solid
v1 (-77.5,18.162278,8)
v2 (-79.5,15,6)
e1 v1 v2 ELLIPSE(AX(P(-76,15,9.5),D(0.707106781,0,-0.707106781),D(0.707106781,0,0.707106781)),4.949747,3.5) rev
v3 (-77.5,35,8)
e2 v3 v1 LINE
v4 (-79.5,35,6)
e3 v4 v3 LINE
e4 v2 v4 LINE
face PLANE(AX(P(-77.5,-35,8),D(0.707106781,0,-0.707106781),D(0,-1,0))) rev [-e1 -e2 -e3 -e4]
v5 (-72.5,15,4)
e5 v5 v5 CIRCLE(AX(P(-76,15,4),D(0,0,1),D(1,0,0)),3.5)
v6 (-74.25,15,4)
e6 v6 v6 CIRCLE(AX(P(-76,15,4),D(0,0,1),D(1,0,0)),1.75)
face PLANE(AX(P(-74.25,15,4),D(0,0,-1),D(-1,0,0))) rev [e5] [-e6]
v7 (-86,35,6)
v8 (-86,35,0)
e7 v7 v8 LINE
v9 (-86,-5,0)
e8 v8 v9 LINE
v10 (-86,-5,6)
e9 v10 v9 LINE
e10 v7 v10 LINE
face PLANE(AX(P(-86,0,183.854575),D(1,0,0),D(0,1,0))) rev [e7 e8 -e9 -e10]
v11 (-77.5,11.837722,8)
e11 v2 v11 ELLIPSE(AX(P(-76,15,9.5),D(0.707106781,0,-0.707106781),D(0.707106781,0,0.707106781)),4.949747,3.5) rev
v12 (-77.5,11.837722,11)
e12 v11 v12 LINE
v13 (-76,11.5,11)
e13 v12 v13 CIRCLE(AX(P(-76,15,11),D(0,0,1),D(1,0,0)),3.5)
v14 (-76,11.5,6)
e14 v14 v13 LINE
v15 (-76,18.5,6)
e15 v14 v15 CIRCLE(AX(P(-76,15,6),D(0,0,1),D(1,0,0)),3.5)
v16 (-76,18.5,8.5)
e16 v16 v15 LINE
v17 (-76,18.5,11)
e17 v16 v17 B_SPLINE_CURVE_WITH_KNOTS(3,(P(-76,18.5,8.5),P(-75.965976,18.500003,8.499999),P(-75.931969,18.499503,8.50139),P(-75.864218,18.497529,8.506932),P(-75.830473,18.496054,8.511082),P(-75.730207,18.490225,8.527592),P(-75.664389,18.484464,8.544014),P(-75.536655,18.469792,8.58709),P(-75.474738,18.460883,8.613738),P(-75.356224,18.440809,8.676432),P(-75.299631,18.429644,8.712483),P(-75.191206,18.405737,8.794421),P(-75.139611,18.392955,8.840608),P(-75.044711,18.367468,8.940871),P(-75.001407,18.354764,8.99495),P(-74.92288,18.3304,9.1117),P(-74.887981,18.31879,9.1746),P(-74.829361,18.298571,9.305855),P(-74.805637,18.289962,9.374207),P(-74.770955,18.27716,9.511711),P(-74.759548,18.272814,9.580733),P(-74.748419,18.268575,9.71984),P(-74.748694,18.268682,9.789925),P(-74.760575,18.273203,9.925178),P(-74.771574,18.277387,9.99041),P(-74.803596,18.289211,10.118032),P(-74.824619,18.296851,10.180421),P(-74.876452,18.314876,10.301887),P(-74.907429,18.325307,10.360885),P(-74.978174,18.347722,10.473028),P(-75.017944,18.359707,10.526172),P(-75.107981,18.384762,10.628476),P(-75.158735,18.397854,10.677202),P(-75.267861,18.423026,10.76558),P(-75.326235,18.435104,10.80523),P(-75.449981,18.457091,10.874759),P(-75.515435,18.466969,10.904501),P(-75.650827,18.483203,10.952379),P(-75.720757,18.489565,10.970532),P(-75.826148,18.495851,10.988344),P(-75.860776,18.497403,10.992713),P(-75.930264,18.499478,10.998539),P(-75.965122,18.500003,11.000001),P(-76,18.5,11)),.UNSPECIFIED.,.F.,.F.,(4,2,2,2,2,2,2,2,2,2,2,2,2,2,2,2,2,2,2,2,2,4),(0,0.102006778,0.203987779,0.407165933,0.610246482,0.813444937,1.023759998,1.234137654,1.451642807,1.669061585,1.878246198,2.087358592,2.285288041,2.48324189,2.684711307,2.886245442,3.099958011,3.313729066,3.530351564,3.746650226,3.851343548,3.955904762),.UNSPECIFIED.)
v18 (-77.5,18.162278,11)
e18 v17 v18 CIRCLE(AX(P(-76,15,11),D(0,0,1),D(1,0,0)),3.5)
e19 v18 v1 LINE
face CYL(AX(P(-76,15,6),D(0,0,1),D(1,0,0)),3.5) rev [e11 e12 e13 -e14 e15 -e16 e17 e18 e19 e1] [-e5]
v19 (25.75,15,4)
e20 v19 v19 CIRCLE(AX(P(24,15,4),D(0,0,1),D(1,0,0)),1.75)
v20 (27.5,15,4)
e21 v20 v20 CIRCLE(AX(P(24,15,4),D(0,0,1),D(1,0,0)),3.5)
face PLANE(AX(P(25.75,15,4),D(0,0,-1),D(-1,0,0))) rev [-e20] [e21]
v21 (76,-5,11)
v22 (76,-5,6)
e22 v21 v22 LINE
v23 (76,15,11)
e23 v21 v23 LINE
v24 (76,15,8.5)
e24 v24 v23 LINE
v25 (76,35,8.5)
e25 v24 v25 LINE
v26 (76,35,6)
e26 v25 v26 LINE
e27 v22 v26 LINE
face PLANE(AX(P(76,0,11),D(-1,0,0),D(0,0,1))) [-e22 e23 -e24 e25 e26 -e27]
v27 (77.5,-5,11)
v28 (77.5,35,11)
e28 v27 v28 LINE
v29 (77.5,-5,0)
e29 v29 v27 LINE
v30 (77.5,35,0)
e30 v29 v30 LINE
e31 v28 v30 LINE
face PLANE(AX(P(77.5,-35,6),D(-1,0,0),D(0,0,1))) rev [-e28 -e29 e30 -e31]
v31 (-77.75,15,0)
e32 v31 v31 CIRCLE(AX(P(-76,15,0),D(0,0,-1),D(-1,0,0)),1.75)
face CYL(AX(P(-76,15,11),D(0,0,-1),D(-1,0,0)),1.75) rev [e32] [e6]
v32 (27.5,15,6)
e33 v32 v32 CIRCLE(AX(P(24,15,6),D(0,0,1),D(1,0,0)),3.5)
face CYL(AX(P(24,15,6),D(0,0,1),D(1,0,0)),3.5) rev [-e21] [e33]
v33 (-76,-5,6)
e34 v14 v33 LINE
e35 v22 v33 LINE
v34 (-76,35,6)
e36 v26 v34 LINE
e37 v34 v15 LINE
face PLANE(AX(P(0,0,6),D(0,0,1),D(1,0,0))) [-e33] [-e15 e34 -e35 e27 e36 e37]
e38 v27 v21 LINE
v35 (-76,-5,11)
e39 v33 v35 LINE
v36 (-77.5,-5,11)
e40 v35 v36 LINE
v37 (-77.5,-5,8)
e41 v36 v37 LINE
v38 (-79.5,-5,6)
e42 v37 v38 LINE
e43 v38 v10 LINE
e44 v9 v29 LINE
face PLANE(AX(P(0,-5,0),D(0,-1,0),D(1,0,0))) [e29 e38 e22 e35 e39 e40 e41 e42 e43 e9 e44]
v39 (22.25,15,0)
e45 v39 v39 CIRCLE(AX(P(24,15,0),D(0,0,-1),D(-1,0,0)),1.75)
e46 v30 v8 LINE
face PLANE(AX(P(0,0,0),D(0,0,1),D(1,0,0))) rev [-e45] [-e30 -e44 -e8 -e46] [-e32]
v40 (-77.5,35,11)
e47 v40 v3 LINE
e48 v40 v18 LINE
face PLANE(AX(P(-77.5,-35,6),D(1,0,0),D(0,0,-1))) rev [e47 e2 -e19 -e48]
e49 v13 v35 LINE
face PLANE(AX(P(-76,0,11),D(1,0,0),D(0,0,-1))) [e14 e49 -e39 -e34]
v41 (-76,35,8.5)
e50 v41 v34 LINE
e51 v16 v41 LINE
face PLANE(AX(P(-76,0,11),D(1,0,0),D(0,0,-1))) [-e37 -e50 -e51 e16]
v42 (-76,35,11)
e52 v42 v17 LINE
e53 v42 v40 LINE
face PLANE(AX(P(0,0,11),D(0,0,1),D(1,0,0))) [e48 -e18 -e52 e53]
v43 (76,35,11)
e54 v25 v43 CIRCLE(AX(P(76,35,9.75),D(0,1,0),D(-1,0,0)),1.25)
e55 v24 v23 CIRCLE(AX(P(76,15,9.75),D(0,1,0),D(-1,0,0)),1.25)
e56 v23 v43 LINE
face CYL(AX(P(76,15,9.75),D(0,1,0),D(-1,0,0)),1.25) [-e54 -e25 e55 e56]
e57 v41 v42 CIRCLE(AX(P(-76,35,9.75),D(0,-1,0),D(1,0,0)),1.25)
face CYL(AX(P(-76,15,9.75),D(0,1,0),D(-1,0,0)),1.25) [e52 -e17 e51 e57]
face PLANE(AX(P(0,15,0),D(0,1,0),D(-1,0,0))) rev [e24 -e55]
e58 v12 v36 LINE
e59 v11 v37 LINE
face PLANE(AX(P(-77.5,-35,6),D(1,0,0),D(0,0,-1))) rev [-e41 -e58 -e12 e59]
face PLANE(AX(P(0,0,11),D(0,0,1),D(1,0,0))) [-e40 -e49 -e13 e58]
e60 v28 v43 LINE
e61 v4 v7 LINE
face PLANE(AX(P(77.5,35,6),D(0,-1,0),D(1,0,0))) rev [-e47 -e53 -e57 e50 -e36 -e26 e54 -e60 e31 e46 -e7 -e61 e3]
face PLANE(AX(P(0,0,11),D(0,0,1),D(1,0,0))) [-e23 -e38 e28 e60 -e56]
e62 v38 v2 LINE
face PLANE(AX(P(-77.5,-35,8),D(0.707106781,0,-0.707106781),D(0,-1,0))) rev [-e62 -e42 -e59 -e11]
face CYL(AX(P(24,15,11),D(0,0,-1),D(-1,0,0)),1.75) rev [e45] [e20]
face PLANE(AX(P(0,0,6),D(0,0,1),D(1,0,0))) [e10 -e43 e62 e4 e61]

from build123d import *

# Parameters (mm, degrees)
SCHIZZO1_W                   = 155
SCHIZZO1_H                   = 70
ESTRUSIONE_ESTRUSIONE1_DEPTH = 6
ESTRUSIONE_ESTRUSIONE3_DEPTH = 5
ESTRUSIONE_ESTRUSIONE4_DEPTH = 20
SCHIZZO6_W                   = 8.5
SCHIZZO6_H                   = 70
ESTRUSIONE_ESTRUSIONE5_DEPTH = 6
SCHIZZO7_R                   = 1.75
TAGLIO_ESTRUSIONE2_DEPTH     = 94.498663092
FORO1_AT_2_COUNT             = 2
FORO1_AT_2_PITCH             = 100
SCHIZZO9_R                   = 3.5
TAGLIO_ESTRUSIONE3_DEPTH     = 94.112834821
SMUSSO1_SIZE                 = 2
TAGLIO_ESTRUSIONE4_DEPTH     = 30


with BuildPart() as part:
    # Schizzo1 → Estrusione-Estrusione1 (new body)
    with BuildSketch(Plane.XY):
        Rectangle(SCHIZZO1_W, SCHIZZO1_H)
    extrude(amount=ESTRUSIONE_ESTRUSIONE1_DEPTH)

    # Schizzo3 → Estrusione-Estrusione3 (add)
    with BuildSketch(Plane.XY.offset(6)):
        Polygon((-76, -33.5), (-76, 35), (-77.5, 35), (-77.5, -35), (-76, -35), align=None)
        Polygon((77.5, 35), (76, 35), (76, -33.5), (76, -35), (77.5, -35), align=None)
    extrude(amount=ESTRUSIONE_ESTRUSIONE3_DEPTH)

    # Schizzo4 → Estrusione-Estrusione4 (add)
    with BuildSketch(Plane(origin=(0, 35, 0), x_dir=(1, 0, 0), z_dir=(0, 1, 0))):
        with BuildLine():
            ThreePointArc((76, -8.5), (74.75, -9.75), (76, -11))
            Line((76, -11), (76, -8.5))
        make_face()
    estrusione_estrusione4 = extrude(amount=-ESTRUSIONE_ESTRUSIONE4_DEPTH)

    # Specchia1: Estrusione-Estrusione4 across plane
    add(estrusione_estrusione4.mirror(Plane(origin=(0, 0, 0), x_dir=(0, 0, 1), z_dir=(1, 0, 0))))

    # Schizzo6 → Estrusione-Estrusione5 (add)
    with BuildSketch(Plane.XY):
        with Locations((-81.75, 0)):
            Rectangle(SCHIZZO6_W, SCHIZZO6_H)
    extrude(amount=ESTRUSIONE_ESTRUSIONE5_DEPTH)

    # Schizzo7 → Taglio-Estrusione2 (cut, through all)
    with BuildSketch(Plane(origin=(0, 0, 0), x_dir=(-1, 0, 0), z_dir=(0, 0, -1))):
        with Locations((-24, 15)):
            Circle(SCHIZZO7_R)
        with Locations((76, 15)):
            Circle(SCHIZZO7_R)
    extrude(amount=-TAGLIO_ESTRUSIONE2_DEPTH, mode=Mode.SUBTRACT)

    # Schizzo8 → Foro1 (revolve, cut)
    with BuildSketch(Plane(origin=(24, 15, 6), x_dir=(0, -1, 0), z_dir=(1, 0, 0))):
        Polygon((0, 0), (0, 7.051506083), (1.75, 6), (1.75, 2), (3.5, 2), (3.5, 0), align=None)
    foro1 = revolve(axis=Axis((24, 15, 17.310875039), (0, 0, -1)), mode=Mode.SUBTRACT)

    # Foro1 at 2: Foro1 ×2
    with Locations(*[(-i * FORO1_AT_2_PITCH, 0, 0) for i in range(1, FORO1_AT_2_COUNT)]):
        add(foro1, mode=Mode.SUBTRACT)

    # Schizzo9 → Taglio-Estrusione3 (cut, through all)
    with BuildSketch(Plane.XY.offset(4)):
        with Locations((-76, 15)):
            Circle(SCHIZZO9_R)
    extrude(amount=TAGLIO_ESTRUSIONE3_DEPTH, mode=Mode.SUBTRACT)

    # Smusso1
    # the kernel refuses this chamfer: 2 mm, written as the material it adds along each edge
    with BuildSketch(Plane(origin=(-77.5, 13.018911684, 6), x_dir=(-0.9996219169112968, 0, -0.027495876610586414), z_dir=(0, 1, 0))) as smusso1_piece_1_section:
        Polygon((SMUSSO1_SIZE * 0.999621916911, SMUSSO1_SIZE * 0.0274958766106), (-SMUSSO1_SIZE * 0.0274958766106, SMUSSO1_SIZE * 0.999621916911), (0, 0), align=None)
    smusso1_piece_1 = extrude(amount=21.981088316, mode=Mode.PRIVATE)
    smusso1_piece_1 = smusso1_piece_1 - Plane(origin=(-76, 15, 6.650360418), x_dir=(0, -1, 0), z_dir=(0, 0, 1)) * Cylinder(3.5, 52, mode=Mode.PRIVATE)
    add(smusso1_piece_1)
    with BuildSketch(Plane(origin=(-77.5, -35, 6), x_dir=(0.02749587661058907, 0, 0.9996219169112965), z_dir=(0, 1, 0))) as smusso1_piece_2_section:
        Polygon((SMUSSO1_SIZE * 0.999621916911, -SMUSSO1_SIZE * 0.0274958766106), (-SMUSSO1_SIZE * 0.0274958766106, -SMUSSO1_SIZE * 0.999621916911), (0, 0), align=None)
    smusso1_piece_2 = extrude(amount=51.981088316, mode=Mode.PRIVATE)
    smusso1_piece_2 = smusso1_piece_2 - Plane(origin=(-76, 15, 6.656201353), x_dir=(1, 0, 0), z_dir=(0, 0, -1)) * Cylinder(3.5, 112, mode=Mode.PRIVATE)
    add(smusso1_piece_2)

    # Schizzo10 → Taglio-Estrusione4 (cut)
    with BuildSketch(Plane.XZ.offset(35)):
        Polygon((76, 11), (76, 6), (-76, 6), (-76, 11), (-77.5, 11), (-77.5, 8), (-79.5, 6), (-86, 6), (-86, 0), (77.5, 0), (77.5, 11), align=None)
    extrude(amount=-TAGLIO_ESTRUSIONE4_DEPTH, mode=Mode.SUBTRACT)


solid = part.part
